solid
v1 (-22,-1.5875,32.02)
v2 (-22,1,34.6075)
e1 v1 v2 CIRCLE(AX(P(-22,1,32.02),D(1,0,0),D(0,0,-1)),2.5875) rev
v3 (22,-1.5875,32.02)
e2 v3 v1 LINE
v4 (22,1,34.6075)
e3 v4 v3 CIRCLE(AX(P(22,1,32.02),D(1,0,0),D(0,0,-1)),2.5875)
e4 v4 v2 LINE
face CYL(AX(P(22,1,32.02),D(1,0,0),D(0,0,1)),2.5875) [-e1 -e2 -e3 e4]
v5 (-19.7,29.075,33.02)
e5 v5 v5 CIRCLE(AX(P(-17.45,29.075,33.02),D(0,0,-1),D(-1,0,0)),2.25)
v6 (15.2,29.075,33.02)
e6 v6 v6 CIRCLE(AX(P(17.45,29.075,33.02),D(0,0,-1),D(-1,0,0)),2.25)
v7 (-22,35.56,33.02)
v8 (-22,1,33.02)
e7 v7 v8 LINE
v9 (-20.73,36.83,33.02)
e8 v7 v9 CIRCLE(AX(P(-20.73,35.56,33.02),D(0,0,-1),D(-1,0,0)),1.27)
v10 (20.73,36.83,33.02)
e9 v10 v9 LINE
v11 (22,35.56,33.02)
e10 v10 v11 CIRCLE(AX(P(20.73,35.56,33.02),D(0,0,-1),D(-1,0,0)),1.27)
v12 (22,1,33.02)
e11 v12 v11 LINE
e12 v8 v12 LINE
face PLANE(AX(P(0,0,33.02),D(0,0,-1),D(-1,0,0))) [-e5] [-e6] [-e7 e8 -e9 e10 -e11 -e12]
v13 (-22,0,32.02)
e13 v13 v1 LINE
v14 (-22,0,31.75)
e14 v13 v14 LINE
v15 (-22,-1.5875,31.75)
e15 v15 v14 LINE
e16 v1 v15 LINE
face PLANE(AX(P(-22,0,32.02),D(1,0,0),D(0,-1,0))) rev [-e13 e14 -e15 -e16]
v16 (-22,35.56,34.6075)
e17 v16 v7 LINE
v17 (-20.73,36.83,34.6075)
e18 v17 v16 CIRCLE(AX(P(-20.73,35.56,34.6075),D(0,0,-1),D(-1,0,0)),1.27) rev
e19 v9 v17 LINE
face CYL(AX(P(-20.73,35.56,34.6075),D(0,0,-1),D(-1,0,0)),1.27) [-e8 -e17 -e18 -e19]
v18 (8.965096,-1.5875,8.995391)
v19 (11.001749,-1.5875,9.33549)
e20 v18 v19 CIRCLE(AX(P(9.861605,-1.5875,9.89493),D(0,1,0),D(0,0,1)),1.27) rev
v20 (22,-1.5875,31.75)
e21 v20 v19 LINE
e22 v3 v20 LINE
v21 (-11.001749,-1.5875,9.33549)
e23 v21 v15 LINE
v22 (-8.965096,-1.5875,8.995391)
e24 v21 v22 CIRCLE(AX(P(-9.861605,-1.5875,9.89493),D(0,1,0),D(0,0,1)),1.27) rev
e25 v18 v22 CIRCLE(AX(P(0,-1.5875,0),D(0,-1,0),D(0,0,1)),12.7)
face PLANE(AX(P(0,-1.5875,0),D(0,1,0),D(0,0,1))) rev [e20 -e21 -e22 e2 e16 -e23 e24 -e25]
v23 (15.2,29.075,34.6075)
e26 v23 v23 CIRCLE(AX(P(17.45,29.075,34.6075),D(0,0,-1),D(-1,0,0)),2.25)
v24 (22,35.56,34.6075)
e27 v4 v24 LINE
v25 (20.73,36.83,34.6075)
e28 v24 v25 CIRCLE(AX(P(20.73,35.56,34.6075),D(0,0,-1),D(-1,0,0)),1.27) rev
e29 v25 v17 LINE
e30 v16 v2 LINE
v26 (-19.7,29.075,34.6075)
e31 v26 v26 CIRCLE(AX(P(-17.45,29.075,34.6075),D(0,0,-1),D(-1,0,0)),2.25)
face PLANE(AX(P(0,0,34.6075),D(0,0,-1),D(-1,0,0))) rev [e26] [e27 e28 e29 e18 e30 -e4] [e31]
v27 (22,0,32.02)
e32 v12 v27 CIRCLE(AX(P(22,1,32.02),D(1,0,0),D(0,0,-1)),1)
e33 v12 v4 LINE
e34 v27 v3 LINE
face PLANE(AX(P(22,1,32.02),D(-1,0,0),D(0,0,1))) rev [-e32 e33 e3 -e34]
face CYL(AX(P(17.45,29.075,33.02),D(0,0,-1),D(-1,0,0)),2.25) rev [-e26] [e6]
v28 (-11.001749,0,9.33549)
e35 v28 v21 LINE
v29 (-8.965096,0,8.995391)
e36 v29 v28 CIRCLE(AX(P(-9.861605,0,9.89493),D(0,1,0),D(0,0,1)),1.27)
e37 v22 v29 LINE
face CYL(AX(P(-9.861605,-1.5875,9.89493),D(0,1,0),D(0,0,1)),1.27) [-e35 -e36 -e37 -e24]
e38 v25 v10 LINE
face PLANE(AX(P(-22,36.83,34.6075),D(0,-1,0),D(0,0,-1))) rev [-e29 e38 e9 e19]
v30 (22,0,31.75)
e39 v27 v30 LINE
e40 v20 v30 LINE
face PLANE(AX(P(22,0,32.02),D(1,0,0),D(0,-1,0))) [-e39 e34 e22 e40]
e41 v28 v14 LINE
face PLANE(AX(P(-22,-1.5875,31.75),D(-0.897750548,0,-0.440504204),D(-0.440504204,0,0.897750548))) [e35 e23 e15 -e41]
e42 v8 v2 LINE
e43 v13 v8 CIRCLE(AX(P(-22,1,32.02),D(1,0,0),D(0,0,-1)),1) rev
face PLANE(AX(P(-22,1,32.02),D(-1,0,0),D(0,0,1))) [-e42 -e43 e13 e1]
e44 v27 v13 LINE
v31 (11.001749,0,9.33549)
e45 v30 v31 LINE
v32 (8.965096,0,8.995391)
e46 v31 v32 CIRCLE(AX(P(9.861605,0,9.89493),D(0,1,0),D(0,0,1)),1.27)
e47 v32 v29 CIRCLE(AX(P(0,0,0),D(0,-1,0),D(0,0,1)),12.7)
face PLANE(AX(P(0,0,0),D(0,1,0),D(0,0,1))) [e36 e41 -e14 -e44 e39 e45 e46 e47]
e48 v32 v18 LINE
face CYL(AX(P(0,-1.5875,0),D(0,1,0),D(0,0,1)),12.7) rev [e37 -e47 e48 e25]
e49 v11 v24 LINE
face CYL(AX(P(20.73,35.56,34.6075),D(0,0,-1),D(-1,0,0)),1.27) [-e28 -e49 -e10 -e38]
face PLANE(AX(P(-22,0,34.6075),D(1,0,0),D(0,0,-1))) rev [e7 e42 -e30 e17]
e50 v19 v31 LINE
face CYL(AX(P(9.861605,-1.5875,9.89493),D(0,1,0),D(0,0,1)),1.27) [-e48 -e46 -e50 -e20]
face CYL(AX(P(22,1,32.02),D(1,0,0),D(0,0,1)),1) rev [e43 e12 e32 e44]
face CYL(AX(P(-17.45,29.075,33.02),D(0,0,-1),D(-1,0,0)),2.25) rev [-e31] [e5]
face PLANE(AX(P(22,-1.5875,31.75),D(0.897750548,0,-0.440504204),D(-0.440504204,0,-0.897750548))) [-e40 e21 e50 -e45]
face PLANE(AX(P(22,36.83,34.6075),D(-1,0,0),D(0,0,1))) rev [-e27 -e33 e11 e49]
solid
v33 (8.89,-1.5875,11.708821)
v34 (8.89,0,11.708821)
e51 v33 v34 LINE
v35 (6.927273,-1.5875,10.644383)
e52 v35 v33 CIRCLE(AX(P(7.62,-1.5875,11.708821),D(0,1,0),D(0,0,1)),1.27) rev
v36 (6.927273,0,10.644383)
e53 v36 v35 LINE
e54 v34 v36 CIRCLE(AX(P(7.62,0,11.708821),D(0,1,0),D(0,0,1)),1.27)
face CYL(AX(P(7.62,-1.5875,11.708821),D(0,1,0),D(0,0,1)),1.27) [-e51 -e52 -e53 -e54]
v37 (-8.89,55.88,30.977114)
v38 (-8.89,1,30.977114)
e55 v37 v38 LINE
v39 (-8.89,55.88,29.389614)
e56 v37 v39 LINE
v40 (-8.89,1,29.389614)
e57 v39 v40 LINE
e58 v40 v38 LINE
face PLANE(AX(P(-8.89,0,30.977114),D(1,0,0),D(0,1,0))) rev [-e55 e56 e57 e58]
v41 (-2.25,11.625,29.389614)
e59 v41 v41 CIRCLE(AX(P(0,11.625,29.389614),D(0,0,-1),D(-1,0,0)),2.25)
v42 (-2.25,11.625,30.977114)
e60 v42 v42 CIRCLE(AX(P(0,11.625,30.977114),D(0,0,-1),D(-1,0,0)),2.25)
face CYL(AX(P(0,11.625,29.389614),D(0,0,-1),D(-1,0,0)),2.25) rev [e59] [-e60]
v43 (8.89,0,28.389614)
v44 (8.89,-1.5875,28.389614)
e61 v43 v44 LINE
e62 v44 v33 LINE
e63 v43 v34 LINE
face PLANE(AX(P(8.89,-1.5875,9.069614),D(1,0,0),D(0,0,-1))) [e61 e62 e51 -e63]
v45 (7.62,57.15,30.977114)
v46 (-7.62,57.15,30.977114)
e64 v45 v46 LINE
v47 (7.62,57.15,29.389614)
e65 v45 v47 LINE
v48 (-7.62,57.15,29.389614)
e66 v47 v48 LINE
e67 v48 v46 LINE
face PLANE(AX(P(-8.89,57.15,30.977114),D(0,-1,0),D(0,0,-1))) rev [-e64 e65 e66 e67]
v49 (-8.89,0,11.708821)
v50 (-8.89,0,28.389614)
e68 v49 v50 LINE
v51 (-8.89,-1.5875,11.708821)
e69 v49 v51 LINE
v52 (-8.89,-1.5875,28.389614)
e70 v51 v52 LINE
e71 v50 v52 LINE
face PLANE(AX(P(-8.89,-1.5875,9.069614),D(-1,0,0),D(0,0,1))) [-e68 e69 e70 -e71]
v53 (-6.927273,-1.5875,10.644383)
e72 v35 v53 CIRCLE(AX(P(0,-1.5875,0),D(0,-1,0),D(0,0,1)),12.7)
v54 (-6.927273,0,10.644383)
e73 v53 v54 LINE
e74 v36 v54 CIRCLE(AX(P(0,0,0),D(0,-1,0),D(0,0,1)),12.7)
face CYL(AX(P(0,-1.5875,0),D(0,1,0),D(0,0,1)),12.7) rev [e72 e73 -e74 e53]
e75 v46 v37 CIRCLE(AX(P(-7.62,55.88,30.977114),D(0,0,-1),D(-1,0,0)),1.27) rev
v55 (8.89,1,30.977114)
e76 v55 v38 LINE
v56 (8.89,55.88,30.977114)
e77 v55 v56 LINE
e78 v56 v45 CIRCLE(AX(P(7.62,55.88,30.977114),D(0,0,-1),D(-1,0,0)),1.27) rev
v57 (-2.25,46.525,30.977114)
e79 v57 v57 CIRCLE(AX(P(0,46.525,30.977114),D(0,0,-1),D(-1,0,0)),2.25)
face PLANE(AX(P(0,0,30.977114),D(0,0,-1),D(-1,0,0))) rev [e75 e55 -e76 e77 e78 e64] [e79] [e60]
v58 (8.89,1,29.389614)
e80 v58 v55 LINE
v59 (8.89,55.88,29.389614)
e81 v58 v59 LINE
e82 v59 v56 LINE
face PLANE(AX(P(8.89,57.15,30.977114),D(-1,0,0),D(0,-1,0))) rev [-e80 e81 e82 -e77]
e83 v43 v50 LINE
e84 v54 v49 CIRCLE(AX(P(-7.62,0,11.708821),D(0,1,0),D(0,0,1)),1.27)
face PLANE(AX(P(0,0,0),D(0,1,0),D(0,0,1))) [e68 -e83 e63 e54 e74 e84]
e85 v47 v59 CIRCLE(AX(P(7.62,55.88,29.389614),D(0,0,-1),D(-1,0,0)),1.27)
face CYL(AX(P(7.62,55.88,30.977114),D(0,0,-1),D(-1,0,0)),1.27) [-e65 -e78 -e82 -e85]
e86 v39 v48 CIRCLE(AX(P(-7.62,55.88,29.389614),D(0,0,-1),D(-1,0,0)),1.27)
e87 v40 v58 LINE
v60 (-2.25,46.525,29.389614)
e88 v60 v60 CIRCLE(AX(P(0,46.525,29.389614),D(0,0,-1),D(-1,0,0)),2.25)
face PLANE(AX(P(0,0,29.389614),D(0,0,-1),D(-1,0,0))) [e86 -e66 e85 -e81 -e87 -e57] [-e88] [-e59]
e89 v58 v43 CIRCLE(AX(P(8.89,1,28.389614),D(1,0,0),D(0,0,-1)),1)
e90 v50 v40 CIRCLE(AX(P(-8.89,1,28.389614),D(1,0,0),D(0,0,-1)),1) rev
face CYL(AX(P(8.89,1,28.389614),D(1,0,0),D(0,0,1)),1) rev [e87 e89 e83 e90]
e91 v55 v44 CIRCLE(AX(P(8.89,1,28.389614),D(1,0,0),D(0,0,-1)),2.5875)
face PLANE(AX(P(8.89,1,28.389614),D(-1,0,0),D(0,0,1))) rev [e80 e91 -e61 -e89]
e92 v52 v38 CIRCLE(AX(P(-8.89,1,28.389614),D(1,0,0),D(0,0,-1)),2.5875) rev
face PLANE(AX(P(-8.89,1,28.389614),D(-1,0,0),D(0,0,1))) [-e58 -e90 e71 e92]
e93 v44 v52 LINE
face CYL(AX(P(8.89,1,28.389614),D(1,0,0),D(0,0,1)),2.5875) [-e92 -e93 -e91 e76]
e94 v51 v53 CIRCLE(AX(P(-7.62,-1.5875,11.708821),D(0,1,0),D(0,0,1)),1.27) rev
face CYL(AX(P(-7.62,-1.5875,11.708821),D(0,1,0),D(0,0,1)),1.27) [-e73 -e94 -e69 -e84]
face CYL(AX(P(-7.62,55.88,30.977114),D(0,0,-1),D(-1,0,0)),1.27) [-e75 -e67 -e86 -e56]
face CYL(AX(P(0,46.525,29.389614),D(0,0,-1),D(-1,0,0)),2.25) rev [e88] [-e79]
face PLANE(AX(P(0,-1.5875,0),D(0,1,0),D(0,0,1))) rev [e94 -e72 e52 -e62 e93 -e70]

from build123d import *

# Parameters (mm, degrees)
BASE_FLANGE1_DEPTH            = 1.5875
EDGE_FLANGE1_DEPTH            = 17.78
M4_CLEARANCE_HOLE1_D          = 4.5
FILLET1_R                     = 1.27
BASE_FLANGE2_DEPTH            = 1.5875
EDGE_FLANGE2_DEPTH            = 43.999999884
SKETCH21_W                    = 2.25
SKETCH21_H                    = 1.5875
M4_CLEARANCE_HOLE2_AT_2_COUNT = 2
M4_CLEARANCE_HOLE2_AT_2_PITCH = 34.9
FILLET2_R                     = 1.27


# Sheet-metal steps are written as plain solids
with BuildPart() as part:
    # Sketch1 → Base-Flange1 (new body)
    with BuildSketch(Plane(origin=(0, 0, 0), x_dir=(1, 0, 0), z_dir=(0, 1, 0))):
        with BuildLine():
            Line((-8.89, -9.069614104), (-8.89, -28.119614104))
            Line((-8.89, -28.119614104), (8.89, -28.119614104))
            Line((8.89, -28.119614104), (8.89, -9.069614104))
            ThreePointArc((8.89, -9.069614104), (0, -12.7), (-8.89, -9.069614104))
        make_face()
    extrude(amount=-BASE_FLANGE1_DEPTH)

    # Edge-Flange1 section (across the edge) → Edge-Flange1 (add)
    with BuildSketch(Plane(origin=(-8.89, 0, 29.389614104), x_dir=(0, 0, -1), z_dir=(1, 0, 0))):
        with BuildLine():
            Line((-1.5875, 1), (-1.5875, 57.15))
            Line((-1.5875, 57.15), (0, 57.15))
            Line((0, 57.15), (0, 1))
            ThreePointArc((0, 1), (0.292893219, 0.292893219), (1, 0))
            Line((1, 0), (1.27, 0))
            Line((1.27, 0), (1.27, -1.5875))
            Line((1.27, -1.5875), (1, -1.5875))
            ThreePointArc((1, -1.5875), (-0.829638796, -0.829638796), (-1.5875, 1))
        make_face()
    extrude(amount=EDGE_FLANGE1_DEPTH)

    # M4 Clearance Hole1 (through all)
    with Locations(Plane(origin=(0, 0, 29.389614104), x_dir=(-1, 0, 0), z_dir=(0, 0, -1))):
        with Locations((0, 46.524999898), (0, 11.625)):
            Hole(M4_CLEARANCE_HOLE1_D / 2)

    # Fillet1
    fillet1_edges = [part.edges().sort_by_distance(p)[0] for p in [
        (-8.89, 57.15, 30.183364104),
        (8.89, 57.15, 30.183364104),
        (8.89, -0.79375, 9.069614104),
        (-8.89, -0.79375, 9.069614104),
    ]]
    fillet(fillet1_edges, radius=FILLET1_R)


with BuildPart() as body_2:
    # Sketch12 → Base-Flange2 (new body)
    with BuildSketch(Plane(origin=(0, 0, 0), x_dir=(1, 0, 0), z_dir=(0, 1, 0))):
        with BuildLine():
            Line((-21.999999942, -31.75), (0, -31.75))
            Line((0, -31.75), (21.999999942, -31.75))
            Line((21.999999942, -31.75), (10.16, -7.62))
            ThreePointArc((10.16, -7.62), (0, -12.7), (-10.16, -7.62))
            Line((-10.16, -7.62), (-21.999999942, -31.75))
        make_face()
    extrude(amount=-BASE_FLANGE2_DEPTH)

    # Edge-Flange2 section (across the edge) → Edge-Flange2 (add)
    with BuildSketch(Plane(origin=(-21.999999942, 0, 33.02), x_dir=(0, 0, -1), z_dir=(1, 0, 0))):
        with BuildLine():
            Line((-1.5875, 1), (-1.5875, 36.83))
            Line((-1.5875, 36.83), (0, 36.83))
            Line((0, 36.83), (0, 1))
            ThreePointArc((0, 1), (0.292893219, 0.292893219), (1, 0))
            Line((1, 0), (1.27, 0))
            Line((1.27, 0), (1.27, -1.5875))
            Line((1.27, -1.5875), (1, -1.5875))
            ThreePointArc((1, -1.5875), (-0.829638796, -0.829638796), (-1.5875, 1))
        make_face()
    extrude(amount=EDGE_FLANGE2_DEPTH)

    # Sketch21 → M4 Clearance Hole2 (revolve, cut)
    with BuildSketch(Plane(origin=(17.45, 29.075, 33.02), x_dir=(0, 1, 0), z_dir=(1, 0, 0))):
        with Locations((1.125, 0.79375)):
            Rectangle(SKETCH21_W, SKETCH21_H)
    m4_clearance_hole2 = revolve(axis=Axis((17.45, 29.075, 26.67), (0, 0, 1)), mode=Mode.SUBTRACT)

    # M4 Clearance Hole2 at 2: M4 Clearance Hole2 ×2
    with Locations(*[(-i * M4_CLEARANCE_HOLE2_AT_2_PITCH, 0, 0) for i in range(1, M4_CLEARANCE_HOLE2_AT_2_COUNT)]):
        add(m4_clearance_hole2, mode=Mode.SUBTRACT)

    # Fillet2
    fillet2_edges = [body_2.edges().sort_by_distance(p)[0] for p in [
        (-21.999999942, 36.83, 33.81375),
        (21.999999942, 36.83, 33.81375),
        (-10.16, -0.79375, 7.62),
        (10.16, -0.79375, 7.62),
    ]]
    fillet(fillet2_edges, radius=FILLET2_R)


solid = Compound([part.part, body_2.part])
